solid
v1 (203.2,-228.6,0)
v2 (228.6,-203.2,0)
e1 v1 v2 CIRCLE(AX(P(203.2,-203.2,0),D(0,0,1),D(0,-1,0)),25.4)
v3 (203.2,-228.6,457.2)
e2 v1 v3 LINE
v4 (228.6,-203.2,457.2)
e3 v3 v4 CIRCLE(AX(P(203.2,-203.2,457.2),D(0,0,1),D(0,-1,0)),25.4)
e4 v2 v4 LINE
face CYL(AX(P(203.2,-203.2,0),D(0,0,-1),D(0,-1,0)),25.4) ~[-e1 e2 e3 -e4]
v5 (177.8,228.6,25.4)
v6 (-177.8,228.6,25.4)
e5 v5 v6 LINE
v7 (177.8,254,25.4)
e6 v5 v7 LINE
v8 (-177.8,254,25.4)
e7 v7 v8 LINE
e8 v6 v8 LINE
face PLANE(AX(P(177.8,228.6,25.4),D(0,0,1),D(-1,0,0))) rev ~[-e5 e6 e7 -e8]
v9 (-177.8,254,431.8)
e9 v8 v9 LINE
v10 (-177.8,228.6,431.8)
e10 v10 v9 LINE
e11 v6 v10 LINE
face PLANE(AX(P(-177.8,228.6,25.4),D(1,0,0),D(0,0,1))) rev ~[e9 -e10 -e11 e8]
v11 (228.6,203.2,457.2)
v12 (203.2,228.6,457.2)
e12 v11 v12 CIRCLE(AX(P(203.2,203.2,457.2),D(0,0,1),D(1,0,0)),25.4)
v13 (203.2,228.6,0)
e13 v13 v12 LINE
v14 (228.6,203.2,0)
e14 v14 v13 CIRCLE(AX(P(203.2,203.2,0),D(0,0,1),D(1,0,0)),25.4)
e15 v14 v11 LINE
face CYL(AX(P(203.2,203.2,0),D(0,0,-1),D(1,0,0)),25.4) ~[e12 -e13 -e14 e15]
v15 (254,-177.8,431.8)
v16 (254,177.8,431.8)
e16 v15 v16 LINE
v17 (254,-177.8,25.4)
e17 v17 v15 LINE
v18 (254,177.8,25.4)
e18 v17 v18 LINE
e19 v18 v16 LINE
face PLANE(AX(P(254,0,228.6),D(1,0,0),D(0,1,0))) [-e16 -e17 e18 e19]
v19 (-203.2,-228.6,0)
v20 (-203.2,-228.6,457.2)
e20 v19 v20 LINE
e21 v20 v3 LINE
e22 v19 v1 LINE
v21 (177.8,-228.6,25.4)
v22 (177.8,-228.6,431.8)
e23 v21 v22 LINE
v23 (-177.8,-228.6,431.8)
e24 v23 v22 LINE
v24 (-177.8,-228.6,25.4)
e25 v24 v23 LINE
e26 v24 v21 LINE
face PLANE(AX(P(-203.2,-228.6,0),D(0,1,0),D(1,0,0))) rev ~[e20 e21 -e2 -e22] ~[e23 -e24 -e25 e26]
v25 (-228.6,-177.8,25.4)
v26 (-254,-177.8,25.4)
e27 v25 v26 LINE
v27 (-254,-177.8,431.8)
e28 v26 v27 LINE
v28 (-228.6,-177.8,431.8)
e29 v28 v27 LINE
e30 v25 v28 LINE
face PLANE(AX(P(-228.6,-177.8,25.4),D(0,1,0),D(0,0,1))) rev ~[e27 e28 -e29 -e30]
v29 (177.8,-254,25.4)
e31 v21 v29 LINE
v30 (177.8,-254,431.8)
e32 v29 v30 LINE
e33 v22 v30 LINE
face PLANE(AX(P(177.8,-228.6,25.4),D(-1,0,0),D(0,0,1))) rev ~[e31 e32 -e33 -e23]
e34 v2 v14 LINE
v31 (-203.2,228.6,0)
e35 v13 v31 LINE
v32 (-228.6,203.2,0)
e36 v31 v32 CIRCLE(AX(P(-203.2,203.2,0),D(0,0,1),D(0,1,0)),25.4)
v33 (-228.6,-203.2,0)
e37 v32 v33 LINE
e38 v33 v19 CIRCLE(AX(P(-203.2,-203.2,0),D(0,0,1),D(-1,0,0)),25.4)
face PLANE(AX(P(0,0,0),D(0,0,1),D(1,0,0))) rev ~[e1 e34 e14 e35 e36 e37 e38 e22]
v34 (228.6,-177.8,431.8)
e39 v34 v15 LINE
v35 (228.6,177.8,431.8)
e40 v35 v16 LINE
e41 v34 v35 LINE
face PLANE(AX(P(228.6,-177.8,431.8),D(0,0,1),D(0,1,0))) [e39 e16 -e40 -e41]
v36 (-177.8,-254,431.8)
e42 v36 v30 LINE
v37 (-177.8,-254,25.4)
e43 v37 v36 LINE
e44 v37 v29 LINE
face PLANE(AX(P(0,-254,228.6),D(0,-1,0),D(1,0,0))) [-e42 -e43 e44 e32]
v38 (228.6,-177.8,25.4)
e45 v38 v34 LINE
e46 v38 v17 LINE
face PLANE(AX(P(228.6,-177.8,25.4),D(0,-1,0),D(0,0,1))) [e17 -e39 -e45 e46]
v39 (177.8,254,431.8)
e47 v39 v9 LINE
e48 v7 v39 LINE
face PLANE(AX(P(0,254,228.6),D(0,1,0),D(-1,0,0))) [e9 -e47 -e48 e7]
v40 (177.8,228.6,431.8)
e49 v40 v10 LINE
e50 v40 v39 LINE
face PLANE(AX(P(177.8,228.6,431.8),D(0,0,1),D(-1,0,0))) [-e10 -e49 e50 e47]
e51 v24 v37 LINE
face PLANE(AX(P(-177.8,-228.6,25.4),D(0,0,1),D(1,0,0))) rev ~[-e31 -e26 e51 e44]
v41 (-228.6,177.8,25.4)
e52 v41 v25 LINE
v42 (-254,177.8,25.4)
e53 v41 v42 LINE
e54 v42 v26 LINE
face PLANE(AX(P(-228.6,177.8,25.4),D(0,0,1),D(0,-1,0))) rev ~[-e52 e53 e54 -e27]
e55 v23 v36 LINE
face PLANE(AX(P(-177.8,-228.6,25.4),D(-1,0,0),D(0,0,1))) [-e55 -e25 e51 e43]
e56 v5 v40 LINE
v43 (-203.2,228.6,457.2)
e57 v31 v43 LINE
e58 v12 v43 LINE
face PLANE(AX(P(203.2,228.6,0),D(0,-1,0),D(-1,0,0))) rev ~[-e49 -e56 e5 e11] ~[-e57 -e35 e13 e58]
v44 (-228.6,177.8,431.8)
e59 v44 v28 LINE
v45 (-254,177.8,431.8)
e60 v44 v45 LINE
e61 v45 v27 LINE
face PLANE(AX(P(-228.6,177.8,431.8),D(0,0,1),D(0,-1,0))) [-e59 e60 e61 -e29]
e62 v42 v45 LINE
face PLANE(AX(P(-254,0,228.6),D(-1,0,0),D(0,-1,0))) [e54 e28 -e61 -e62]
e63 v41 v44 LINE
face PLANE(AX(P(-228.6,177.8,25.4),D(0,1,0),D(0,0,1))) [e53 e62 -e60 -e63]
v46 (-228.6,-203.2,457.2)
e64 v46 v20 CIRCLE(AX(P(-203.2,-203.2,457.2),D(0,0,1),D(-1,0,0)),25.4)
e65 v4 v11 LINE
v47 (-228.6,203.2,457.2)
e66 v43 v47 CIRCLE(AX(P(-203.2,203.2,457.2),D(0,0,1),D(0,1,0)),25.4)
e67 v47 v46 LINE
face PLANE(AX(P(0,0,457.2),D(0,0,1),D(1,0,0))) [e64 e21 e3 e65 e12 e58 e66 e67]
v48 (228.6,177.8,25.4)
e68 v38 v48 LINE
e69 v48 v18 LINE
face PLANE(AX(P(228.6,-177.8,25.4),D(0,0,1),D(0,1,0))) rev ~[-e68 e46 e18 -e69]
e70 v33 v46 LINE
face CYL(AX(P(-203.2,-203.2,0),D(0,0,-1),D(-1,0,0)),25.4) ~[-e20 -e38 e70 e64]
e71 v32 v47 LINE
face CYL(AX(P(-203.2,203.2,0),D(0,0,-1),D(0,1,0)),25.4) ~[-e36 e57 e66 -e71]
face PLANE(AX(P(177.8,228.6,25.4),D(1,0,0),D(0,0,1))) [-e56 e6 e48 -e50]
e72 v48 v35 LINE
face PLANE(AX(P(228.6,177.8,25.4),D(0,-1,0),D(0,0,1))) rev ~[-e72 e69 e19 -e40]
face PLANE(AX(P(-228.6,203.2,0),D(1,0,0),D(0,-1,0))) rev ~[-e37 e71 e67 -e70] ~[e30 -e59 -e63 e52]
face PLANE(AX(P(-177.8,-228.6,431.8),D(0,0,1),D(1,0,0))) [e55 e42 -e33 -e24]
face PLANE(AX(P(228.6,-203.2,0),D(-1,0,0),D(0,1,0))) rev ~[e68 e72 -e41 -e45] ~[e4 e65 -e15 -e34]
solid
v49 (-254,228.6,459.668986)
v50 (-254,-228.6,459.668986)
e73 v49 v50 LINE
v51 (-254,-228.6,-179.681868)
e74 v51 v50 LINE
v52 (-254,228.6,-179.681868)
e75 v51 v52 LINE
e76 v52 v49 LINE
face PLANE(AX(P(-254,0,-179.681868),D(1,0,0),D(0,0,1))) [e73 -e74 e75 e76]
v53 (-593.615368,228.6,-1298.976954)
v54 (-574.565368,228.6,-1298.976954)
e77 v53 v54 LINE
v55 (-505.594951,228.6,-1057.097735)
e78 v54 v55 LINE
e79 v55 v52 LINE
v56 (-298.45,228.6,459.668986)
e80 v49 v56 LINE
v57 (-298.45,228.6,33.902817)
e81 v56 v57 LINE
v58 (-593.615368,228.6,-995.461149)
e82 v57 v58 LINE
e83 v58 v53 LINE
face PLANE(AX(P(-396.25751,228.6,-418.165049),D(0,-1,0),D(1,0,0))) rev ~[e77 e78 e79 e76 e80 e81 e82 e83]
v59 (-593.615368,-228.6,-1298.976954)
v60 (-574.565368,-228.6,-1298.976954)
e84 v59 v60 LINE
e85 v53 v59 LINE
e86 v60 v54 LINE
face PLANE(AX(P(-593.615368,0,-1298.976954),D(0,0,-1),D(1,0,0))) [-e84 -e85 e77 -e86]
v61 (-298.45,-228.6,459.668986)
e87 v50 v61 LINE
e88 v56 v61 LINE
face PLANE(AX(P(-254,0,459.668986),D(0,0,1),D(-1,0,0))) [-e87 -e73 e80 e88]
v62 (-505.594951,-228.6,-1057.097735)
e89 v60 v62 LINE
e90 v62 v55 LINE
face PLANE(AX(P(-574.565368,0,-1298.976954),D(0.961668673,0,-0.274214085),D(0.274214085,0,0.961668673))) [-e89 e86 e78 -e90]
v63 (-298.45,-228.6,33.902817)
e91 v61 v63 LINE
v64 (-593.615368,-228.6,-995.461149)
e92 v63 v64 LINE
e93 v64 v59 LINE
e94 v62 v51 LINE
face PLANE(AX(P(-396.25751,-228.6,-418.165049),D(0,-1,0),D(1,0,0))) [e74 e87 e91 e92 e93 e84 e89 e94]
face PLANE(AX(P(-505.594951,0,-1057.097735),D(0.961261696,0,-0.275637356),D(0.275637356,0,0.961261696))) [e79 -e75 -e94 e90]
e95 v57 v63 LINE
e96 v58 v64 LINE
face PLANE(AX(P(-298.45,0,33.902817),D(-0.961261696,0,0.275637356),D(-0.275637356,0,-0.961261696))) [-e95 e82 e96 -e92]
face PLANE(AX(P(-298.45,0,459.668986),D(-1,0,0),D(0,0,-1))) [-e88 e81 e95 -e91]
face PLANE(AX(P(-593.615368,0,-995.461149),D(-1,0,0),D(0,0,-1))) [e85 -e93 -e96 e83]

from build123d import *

# Parameters (mm, degrees)
F1_DEPTH  = 457.2
F2_W      = 355.6
F2_H      = 406.4
F3_DEPTH  = 25.4
F4_W      = 355.6
F4_H      = 406.4
F5_DEPTH  = 25.4
F6_W      = 355.6
F6_H      = 406.4
F7_DEPTH  = 25.4
F8_W      = 355.6
F8_H      = 406.4
F9_DEPTH  = 25.4
F11_DEPTH = 228.6


# Not quite as in the source:
# - a feature of the source that left no trace in its solid (it failed there, or was rolled back) is left out


with BuildPart() as f1:
    # F0 (on Top) → F1 (new body)
    with BuildSketch(Plane.XY):
        with BuildLine():
            ThreePointArc((-228.6, -203.2), (-221.1605122421, -221.1605122421), (-203.2, -228.6))
            Line((-203.2, -228.6), (203.2, -228.6))
            ThreePointArc((203.2, -228.6), (221.1605122421, -221.1605122421), (228.6, -203.2))
            Line((228.6, -203.2), (228.6, 203.2))
            ThreePointArc((228.6, 203.2), (221.1605122421, 221.1605122421), (203.2, 228.6))
            Line((203.2, 228.6), (-203.2, 228.6))
            ThreePointArc((-203.2, 228.6), (-221.1605122421, 221.1605122421), (-228.6, 203.2))
            Line((-228.6, 203.2), (-228.6, -203.2))
        make_face()
    extrude(amount=F1_DEPTH)

    # F2 (on face) → F3 (join)
    with BuildSketch(Plane.YZ.offset(228.6)):
        with Locations((0, 228.6)):
            Rectangle(F2_W, F2_H)
    extrude(amount=F3_DEPTH)

    # F4 (on face) → F5 (join)
    with BuildSketch(Plane.XZ.offset(228.6)):
        with Locations((0, 228.6)):
            Rectangle(F4_W, F4_H)
    extrude(amount=F5_DEPTH)

    # F6 (on face) → F7 (join)
    with BuildSketch(Plane(origin=(-228.6, 0, 0), x_dir=(0, -1, 0), z_dir=(-1, 0, 0))):
        with Locations((0, 228.6)):
            Rectangle(F6_W, F6_H)
    extrude(amount=F7_DEPTH)

    # F8 (on face) → F9 (join)
    with BuildSketch(Plane(origin=(0, 228.6, 0), x_dir=(-1, 0, 0), z_dir=(0, 1, 0))):
        with Locations((0, 228.6)):
            Rectangle(F8_W, F8_H)
    extrude(amount=F9_DEPTH)


with BuildPart() as f11:
    # F10 (on Front) → F11 (new body, symmetric)
    with BuildSketch(Plane.XZ):
        Polygon((-254, -179.6818675809), (-254, 459.6689861676), (-298.45, 459.6689861676), (-298.45, 33.9028166904), (-593.6153675181, -995.4611493138), (-593.6153675181, -1298.9769535385), (-574.5653675181, -1298.9769535385), (-505.5949514657, -1057.0977353197), align=None)
    extrude(amount=F11_DEPTH, both=True)


solid = Compound([f1.part, f11.part])
